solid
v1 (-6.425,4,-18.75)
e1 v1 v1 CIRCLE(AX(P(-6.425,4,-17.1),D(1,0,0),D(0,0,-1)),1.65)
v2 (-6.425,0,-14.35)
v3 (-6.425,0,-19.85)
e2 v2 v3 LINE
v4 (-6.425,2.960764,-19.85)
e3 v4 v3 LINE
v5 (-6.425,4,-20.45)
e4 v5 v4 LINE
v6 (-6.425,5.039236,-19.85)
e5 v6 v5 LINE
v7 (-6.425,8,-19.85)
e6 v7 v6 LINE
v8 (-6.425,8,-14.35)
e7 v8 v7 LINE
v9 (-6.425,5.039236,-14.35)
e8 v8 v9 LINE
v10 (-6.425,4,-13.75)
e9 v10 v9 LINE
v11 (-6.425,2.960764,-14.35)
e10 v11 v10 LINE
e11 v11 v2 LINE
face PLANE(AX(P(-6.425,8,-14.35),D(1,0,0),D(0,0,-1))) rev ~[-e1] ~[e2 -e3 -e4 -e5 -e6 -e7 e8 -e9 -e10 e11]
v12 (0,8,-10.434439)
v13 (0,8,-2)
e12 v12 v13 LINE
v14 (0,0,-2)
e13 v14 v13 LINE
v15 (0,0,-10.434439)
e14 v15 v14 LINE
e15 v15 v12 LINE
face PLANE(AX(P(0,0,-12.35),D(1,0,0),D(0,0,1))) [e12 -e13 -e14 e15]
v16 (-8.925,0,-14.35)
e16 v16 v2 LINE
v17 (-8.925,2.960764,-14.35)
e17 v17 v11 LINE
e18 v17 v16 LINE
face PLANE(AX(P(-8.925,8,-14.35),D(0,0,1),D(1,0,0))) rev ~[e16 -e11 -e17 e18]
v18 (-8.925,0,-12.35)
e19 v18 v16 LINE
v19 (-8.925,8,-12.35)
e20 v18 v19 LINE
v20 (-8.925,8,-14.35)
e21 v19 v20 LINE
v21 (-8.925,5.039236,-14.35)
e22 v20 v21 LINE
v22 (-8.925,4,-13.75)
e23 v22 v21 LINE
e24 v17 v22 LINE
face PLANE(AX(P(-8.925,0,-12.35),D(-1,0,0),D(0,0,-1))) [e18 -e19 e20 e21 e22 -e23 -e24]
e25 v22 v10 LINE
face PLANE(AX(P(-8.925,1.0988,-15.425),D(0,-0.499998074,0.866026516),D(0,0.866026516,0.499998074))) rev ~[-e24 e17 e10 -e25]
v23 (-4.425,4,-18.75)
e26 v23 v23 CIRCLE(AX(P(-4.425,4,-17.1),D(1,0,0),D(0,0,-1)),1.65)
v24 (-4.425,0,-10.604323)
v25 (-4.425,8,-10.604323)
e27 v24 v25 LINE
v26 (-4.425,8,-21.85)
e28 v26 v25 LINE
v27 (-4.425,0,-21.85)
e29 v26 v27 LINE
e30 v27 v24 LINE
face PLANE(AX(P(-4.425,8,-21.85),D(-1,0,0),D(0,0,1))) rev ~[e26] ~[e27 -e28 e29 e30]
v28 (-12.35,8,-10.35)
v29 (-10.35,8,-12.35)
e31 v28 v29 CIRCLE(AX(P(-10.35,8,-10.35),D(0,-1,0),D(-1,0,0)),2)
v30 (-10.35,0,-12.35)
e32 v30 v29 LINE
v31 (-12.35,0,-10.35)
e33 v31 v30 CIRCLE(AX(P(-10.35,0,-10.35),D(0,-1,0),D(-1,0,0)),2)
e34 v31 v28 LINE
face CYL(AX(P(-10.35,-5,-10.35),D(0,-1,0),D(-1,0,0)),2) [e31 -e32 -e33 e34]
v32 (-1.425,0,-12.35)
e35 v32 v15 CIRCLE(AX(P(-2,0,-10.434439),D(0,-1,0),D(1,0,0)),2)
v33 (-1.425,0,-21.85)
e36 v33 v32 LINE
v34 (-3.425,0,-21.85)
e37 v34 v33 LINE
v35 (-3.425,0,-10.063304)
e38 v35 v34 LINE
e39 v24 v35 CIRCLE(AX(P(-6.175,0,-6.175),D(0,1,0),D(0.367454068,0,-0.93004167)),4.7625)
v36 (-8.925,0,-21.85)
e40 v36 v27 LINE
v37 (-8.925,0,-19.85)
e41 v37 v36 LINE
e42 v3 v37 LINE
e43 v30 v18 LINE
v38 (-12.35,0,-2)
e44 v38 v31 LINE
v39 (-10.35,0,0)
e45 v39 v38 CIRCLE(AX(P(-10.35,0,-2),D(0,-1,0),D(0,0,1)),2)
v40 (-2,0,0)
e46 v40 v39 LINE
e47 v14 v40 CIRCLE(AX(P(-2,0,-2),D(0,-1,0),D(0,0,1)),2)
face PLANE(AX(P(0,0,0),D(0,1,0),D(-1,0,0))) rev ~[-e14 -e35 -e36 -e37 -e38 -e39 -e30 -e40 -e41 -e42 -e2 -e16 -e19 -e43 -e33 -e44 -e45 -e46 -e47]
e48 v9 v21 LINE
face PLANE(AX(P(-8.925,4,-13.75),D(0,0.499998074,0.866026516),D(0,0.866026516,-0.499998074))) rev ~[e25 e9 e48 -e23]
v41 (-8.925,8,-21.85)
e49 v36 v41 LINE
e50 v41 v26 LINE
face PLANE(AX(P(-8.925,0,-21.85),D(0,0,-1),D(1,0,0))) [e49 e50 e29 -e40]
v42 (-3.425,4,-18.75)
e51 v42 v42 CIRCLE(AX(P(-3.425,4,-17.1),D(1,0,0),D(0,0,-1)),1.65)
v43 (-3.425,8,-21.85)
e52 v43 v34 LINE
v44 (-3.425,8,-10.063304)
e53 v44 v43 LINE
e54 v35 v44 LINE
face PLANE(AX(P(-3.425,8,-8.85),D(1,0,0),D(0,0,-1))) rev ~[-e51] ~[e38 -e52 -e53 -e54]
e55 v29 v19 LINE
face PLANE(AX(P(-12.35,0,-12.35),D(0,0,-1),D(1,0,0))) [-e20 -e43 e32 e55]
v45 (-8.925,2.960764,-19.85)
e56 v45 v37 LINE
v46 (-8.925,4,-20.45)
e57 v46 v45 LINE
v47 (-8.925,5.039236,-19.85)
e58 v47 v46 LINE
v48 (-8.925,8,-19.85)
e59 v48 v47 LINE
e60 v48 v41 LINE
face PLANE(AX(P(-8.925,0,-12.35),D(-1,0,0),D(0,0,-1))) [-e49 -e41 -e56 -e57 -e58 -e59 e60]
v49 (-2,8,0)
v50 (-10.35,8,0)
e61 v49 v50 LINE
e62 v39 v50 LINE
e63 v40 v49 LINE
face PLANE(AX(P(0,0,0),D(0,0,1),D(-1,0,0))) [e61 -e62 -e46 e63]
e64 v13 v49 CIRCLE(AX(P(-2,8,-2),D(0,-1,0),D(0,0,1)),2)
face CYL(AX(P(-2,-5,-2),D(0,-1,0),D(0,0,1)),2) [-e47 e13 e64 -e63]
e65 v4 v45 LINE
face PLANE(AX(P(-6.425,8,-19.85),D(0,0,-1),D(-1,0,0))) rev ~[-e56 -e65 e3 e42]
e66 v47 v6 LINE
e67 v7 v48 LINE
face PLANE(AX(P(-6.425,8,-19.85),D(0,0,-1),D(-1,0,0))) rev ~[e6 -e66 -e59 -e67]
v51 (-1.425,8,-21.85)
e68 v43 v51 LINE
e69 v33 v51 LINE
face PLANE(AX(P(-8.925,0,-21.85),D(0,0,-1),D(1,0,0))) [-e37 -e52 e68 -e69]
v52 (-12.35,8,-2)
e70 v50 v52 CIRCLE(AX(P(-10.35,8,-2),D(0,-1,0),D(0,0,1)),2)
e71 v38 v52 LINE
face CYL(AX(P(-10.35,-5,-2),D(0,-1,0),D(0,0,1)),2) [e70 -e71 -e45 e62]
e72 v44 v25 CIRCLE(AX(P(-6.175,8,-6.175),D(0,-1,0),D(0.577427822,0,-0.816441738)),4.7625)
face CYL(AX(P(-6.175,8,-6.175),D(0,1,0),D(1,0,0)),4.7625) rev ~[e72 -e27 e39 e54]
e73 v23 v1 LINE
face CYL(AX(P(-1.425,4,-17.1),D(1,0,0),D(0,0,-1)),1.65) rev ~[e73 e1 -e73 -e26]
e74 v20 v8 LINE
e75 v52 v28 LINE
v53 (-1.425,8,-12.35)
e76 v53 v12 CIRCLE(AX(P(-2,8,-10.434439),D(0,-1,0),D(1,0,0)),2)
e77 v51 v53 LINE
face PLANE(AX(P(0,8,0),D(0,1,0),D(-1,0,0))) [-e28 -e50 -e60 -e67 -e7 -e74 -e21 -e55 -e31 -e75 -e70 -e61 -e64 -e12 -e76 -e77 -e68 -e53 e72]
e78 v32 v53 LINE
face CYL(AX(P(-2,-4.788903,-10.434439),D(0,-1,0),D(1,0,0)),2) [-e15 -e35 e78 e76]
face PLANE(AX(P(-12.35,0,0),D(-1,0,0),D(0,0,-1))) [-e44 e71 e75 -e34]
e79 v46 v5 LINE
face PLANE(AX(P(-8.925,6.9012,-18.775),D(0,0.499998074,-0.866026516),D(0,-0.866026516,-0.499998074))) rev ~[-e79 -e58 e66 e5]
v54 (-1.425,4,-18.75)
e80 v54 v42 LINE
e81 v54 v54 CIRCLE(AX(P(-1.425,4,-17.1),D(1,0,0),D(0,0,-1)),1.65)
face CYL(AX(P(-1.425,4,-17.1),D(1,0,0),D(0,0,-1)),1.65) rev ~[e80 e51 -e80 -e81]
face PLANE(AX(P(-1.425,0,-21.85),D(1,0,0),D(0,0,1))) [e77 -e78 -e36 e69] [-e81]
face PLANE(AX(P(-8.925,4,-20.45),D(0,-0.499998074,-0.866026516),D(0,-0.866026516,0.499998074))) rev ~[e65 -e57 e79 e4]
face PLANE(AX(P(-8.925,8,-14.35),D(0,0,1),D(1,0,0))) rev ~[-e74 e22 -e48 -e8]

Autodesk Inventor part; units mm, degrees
ref_plane "YZ Plane" through (0, 0, 0) normal (1, 0, 0) x (0, 1, 0)
ref_plane "XZ Plane" through (0, 0, 0) normal (0, 1, 0) x (-1, 0, 0)
ref_plane "XY Plane" through (0, 0, 0) normal (0, 0, 1) x (1, 0, 0)
sketch "Sketch4" plane through (0, 0, 0) normal (0, 1, 0) x (-1, 0, 0)
  line L0 (0, 0) -> (12.35, 0)
  line L1 (12.35, 0) -> (12.35, -12.35)
  line L2 (12.35, -12.35) -> (8.925, -12.35)
  line L3 (8.925, -12.35) -> (8.925, -21.85)
  line L4 (8.925, -21.85) -> (1.425, -21.85)
  line L5 (1.425, -21.85) -> (1.425, -12.35)
  line L6 (1.425, -12.35) -> (0, -12.35)
  line L7 (0, -12.35) -> (0, 0)
  dimension "d17" = 12.35
  dimension "d18" = 12.35
  dimension "d19" = 7.5
  dimension "d20" = 1.425
  dimension "d21" = 9.5
extrude "Extrusion2" add sketch "Sketch4" along normal blind 8
sketch "Sketch5" plane through (0, 8, 0) normal (0, 1, 0) x (1, 0, 0)
  line L0 (-8.925, 14.35) -> (-6.425, 14.35)
  line L1 (-6.425, 14.35) -> (-6.425, 19.85)
  line L2 (-6.425, 19.85) -> (-8.925, 19.85)
  line L3 (-8.925, 19.85) -> (-8.925, 14.35)
  line L4 (-1.425, 21.85) -> (-8.925, 21.85) projected
  line L5 (-8.925, 21.85) -> (-8.925, 12.35) projected
  point P0 (0, 0)
  dimension "d24" = 5.5
  dimension "d25" = 2.5
  dimension "d26" = 2
extrude "Extrusion3" cut sketch "Sketch5" against normal through all
sketch "Sketch6" plane through (0, 8, 0) normal (0, 1, 0) x (1, 0, 0)
  circle A0 centre (-6.175, 6.175) radius 4.7625
  line L0 (-12.35, 0) -> (0, 0) projected
  line L1 (0, 0) -> (0, 12.35) projected
  dimension "d29" = 9.525
  dimension "d30" = 6.175
  dimension "d31" = 6.175
extrude "Extrusion4" cut sketch "Sketch6" against normal through all
sketch "Sketch7" plane through (0, 8, 0) normal (0, 1, 0) x (1, 0, 0)
  line L0 (-4.425, 8.85) -> (-3.425, 8.85)
  line L1 (-3.425, 8.85) -> (-3.425, 21.85)
  line L2 (-3.425, 21.85) -> (-4.425, 21.85)
  line L3 (-4.425, 21.85) -> (-4.425, 8.85)
  line L4 (-1.425, 21.85) -> (-8.925, 21.85) projected
  line L5 (-1.425, 12.35) -> (-1.425, 21.85) projected
  point P0 (0, 0)
  dimension "d34" = 1
  dimension "d35" = 13
  dimension "d36" = 2
extrude "Extrusion5" cut sketch "Sketch7" against normal through all
sketch "Sketch8" plane through (-1.425, 0, -12.35) normal (1, 0, 0) x (0, 0, -1)
  circle A0 centre (4.75, 4) radius 1.65
  line L0 (0, 0) -> (9.5, 0) projected
  line L1 (9.5, 0) -> (9.5, 8) projected
  point P0 (-12.35, 0)
  dimension "d39" = 3.3
  dimension "d40" = 4
  dimension "d41" = 4.75
extrude "Extrusion6" cut sketch "Sketch8" against normal through all
fillet "Fillet1" radius 2 4 edges at (-12.35, 4, -12.35) (-12.35, 4, 0) (0, 4, 0) (0, 4, -12.35)
sketch "Sketch9" plane through (-8.925, 0, -12.35) normal (-1, 0, 0) x (0, 0, 1)
  line L0 (-8.1, 4) -> (-6.425, 1.0988)
  line L1 (-6.425, 1.0988) -> (-3.075, 1.0988)
  line L2 (-3.075, 1.0988) -> (-1.4, 4)
  line L3 (-1.4, 4) -> (-3.075, 6.9012)
  line L4 (-3.075, 6.9012) -> (-6.425, 6.9012)
  line L5 (-6.425, 6.9012) -> (-8.1, 4)
  line L6 (-9.5, 8) -> (-7.5, 8) projected
  line L7 (-9.5, 0) -> (-9.5, 8) projected
  point P0 (12.35, 0)
  dimension "d46" = 3.35
  dimension "d47" = 3.35
  dimension "d48" = 3.35
  dimension "d49" = 3.35
  dimension "d50" = 3.35
  dimension "d51" = 120
  dimension "d52" = 120
  dimension "d53" = 4
  dimension "d55" = 6.425
extrude "Extrusion7" cut sketch "Sketch9" against normal blind 2.5
equation "\"d48\" = d46"
equation "\"d49\" = d47"
equation "\"d50\" = d47"
properties part number "COLLIER"
